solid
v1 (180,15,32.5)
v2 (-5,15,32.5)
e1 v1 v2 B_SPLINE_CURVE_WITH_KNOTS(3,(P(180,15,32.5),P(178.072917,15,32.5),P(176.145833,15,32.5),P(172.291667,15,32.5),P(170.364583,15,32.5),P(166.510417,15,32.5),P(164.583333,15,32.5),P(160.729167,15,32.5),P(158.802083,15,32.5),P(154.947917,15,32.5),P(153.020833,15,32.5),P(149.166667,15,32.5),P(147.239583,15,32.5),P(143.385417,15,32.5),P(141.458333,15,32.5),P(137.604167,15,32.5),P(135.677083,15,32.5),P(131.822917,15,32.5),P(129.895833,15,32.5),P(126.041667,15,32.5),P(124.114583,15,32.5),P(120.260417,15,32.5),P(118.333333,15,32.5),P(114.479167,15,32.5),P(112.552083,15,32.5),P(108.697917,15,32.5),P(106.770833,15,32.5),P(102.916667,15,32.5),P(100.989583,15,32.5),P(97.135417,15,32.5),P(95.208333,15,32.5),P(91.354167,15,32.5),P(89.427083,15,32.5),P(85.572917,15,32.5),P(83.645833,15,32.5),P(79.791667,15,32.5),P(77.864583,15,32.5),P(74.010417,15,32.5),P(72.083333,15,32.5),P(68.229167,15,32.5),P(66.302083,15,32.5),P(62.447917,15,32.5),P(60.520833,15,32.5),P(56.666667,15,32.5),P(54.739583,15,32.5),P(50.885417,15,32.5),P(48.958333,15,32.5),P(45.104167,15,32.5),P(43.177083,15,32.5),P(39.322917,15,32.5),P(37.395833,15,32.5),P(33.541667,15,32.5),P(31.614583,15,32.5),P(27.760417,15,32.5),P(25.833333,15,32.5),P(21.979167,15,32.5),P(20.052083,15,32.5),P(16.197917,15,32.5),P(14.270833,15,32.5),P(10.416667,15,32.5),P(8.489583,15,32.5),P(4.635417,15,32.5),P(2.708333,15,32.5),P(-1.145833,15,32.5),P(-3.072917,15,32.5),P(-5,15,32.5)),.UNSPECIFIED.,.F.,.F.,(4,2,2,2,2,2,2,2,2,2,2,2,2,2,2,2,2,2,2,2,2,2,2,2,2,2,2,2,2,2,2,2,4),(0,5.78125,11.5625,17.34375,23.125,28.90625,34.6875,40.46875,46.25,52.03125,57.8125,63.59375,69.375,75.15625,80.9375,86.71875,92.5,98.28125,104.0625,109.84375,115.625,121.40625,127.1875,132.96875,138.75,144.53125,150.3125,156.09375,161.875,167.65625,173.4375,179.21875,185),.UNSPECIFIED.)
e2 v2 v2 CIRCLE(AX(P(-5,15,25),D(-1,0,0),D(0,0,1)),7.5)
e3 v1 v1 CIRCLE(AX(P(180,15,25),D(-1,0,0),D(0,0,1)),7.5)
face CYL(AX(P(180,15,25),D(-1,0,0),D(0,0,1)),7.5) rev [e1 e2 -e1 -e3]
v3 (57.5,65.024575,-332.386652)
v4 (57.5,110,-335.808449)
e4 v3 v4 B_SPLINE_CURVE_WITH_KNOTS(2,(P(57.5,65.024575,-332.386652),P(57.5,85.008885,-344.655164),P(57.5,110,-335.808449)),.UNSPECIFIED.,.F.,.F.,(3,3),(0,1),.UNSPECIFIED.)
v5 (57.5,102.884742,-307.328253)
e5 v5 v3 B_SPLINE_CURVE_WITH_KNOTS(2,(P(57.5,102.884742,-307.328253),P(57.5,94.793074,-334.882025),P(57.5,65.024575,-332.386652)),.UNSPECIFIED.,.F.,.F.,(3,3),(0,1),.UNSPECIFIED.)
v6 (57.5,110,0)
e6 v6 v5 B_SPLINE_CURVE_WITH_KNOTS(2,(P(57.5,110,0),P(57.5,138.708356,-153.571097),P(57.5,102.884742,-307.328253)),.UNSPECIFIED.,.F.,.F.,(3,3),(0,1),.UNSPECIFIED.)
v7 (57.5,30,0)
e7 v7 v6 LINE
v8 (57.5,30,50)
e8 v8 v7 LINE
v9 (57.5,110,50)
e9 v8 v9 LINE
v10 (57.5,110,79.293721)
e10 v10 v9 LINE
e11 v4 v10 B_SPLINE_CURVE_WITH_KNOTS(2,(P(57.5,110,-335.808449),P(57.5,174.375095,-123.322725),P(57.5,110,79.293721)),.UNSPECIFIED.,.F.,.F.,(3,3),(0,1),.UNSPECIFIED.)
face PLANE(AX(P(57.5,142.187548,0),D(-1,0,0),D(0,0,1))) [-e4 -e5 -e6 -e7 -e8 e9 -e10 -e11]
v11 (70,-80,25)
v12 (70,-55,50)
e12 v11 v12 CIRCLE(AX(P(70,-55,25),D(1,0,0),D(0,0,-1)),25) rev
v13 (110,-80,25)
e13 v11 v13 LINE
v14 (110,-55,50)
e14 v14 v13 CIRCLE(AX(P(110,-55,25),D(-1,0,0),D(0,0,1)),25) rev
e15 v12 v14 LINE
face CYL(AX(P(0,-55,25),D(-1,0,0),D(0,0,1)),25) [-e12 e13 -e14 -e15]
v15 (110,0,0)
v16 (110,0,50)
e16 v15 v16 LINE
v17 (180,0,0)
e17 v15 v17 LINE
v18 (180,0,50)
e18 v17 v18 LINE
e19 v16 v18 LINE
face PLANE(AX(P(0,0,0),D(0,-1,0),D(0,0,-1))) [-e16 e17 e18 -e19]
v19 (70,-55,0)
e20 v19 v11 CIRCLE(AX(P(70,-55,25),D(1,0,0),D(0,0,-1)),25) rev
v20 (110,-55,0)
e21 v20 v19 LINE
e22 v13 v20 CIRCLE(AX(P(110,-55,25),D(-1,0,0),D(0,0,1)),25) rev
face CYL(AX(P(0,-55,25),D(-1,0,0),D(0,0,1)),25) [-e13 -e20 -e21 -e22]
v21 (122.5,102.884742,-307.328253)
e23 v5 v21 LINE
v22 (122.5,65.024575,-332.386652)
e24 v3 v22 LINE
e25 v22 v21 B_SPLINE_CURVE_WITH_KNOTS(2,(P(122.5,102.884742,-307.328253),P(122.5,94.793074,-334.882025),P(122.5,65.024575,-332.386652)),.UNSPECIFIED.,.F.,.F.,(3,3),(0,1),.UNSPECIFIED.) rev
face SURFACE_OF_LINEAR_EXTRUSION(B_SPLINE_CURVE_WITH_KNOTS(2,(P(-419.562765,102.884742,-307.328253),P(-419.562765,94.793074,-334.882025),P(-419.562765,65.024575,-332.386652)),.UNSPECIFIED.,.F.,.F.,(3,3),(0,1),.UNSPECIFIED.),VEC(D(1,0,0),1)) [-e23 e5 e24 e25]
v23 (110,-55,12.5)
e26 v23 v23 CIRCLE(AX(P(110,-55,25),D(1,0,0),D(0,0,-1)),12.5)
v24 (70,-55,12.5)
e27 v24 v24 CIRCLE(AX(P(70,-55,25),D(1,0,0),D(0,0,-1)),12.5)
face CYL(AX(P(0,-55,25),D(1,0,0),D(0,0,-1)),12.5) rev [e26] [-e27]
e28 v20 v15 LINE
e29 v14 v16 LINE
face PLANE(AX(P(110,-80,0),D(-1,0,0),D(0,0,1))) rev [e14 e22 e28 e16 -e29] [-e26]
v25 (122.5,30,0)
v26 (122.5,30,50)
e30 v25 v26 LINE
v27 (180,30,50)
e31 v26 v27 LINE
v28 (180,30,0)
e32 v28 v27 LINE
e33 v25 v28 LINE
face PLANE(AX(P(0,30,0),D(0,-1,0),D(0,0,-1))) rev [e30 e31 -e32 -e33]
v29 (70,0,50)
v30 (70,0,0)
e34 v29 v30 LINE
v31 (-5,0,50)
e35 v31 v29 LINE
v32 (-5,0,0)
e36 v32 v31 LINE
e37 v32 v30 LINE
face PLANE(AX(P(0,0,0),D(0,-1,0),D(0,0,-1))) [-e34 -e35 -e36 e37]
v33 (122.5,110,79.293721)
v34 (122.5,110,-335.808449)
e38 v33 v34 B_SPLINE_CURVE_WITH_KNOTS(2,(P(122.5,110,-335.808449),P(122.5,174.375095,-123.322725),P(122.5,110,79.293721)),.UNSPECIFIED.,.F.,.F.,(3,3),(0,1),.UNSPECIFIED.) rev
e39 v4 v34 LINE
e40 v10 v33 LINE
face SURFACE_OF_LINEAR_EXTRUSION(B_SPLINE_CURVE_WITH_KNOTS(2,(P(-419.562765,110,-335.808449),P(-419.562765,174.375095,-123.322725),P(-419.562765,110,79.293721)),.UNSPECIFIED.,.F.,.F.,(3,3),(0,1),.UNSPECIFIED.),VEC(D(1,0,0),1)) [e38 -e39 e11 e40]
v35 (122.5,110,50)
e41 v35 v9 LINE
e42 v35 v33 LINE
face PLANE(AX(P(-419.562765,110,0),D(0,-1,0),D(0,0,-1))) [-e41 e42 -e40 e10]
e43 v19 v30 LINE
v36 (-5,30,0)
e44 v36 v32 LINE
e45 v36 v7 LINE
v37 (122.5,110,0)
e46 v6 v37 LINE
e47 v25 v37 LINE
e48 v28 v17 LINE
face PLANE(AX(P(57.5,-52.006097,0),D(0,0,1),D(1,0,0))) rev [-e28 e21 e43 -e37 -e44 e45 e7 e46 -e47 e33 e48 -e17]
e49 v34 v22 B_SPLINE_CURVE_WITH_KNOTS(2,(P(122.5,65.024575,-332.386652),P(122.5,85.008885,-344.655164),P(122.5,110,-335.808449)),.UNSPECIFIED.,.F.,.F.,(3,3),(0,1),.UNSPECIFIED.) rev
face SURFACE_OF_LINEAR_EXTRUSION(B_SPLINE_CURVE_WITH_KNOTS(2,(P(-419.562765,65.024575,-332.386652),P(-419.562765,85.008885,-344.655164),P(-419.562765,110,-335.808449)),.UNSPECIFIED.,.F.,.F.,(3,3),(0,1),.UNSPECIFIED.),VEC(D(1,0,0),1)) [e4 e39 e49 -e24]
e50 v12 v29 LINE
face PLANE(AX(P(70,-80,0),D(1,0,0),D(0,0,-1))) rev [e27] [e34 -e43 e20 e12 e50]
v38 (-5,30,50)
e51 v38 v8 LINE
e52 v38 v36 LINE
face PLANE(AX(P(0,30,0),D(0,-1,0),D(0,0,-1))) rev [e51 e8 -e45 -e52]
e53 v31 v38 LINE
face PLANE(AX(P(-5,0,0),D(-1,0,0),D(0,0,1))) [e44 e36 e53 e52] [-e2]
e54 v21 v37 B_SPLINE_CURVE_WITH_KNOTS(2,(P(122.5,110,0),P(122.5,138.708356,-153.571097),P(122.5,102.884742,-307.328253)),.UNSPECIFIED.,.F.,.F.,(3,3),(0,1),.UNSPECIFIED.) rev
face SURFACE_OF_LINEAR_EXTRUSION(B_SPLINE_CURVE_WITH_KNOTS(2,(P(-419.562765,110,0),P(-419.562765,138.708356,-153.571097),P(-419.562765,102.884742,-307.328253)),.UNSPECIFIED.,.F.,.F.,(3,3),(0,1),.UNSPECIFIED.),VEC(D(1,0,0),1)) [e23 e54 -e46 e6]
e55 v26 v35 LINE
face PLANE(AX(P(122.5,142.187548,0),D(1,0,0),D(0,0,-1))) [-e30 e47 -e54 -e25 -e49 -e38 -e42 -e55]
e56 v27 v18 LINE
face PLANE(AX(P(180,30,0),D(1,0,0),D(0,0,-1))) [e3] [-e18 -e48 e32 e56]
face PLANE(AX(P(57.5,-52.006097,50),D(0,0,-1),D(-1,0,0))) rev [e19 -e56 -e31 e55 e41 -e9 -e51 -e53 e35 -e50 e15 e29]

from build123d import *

# Parameters (mm, degrees)
SKETCH_1_W          = 180
SKETCH_1_H          = 50
EXTRUDE_1_DEPTH     = 30
SKETCH_2_W          = 40
SKETCH_2_H          = 50
EXTRUDE_2_DEPTH     = 80
FILLET_1_R          = 25
SKETCH_3_R          = 12.5
CUT_EXTRUDE_2_DEPTH = 145.913767462
SKETCH_7_W          = 25
SKETCH_7_H          = 50
EXTRUDE_5_DEPTH     = 80
EXTRUDE_6_REACH     = 213.019
SKETCH_9_W          = 25.5
SKETCH_9_H          = 50
CUT_EXTRUDE_3_DEPTH = 401.320460854
SKETCH_10_W         = 65
SKETCH_10_H         = 50
EXTRUDE_7_DEPTH     = 80
SKETCH_11_W         = 50
SKETCH_11_H         = 30
EXTRUDE_8_DEPTH     = 10
SKETCH_12_W         = 50
SKETCH_12_H         = 30
CUT_EXTRUDE_4_DEPTH = 5
SKETCH_13_R         = 7.5
CUT_EXTRUDE_5_DEPTH = 412.96204223


with BuildPart() as part:
    # 草图1 → 凸台-拉伸1 (new body)
    with BuildSketch(Plane(origin=(0, 0, 0), x_dir=(1, 0, 0), z_dir=(0, 1, 0))):
        with Locations((90, -25)):
            Rectangle(SKETCH_1_W, SKETCH_1_H)
    extrude(amount=EXTRUDE_1_DEPTH)

    # 草图2 → 凸台-拉伸2 (add)
    with BuildSketch(Plane.XZ):
        with Locations((90, 25)):
            Rectangle(SKETCH_2_W, SKETCH_2_H)
    extrude(amount=EXTRUDE_2_DEPTH)

    # 圆角1
    fillet_1_edges = [part.edges().sort_by_distance(p)[0] for p in [
        (90, -80, 50),
        (90, -80, 0),
    ]]
    fillet(fillet_1_edges, radius=FILLET_1_R - 0.0001)  # a hair under: the kernel refuses the full size

    # 草图3 → 切除-拉伸2 (cut, through all)
    with BuildSketch(Plane(origin=(110, 0, 0), x_dir=(0, 0, -1), z_dir=(1, 0, 0))):
        with Locations((-25, -55)):
            Circle(SKETCH_3_R)
    extrude(amount=-CUT_EXTRUDE_2_DEPTH, mode=Mode.SUBTRACT)

    # 草图7 → 凸台-拉伸5 (add)
    with BuildSketch(Plane(origin=(0, 30, 0), x_dir=(1, 0, 0), z_dir=(0, 1, 0))):
        with Locations((19.5, -25)):
            Rectangle(SKETCH_7_W, SKETCH_7_H)
        with Locations((160.5, -25)):
            Rectangle(SKETCH_7_W, SKETCH_7_H)
    extrude(amount=EXTRUDE_5_DEPTH)

    # 凸台-拉伸6: up to this face of the body (flat: up to its plane)
    extrude_6_end = Plane(part.part.faces().sort_by_distance((7, 70, 25))[0])
    # 草图8 → 凸台-拉伸6 (add, up to the picked face)
    with BuildSketch(Plane(origin=(173, 0, 0), x_dir=(0, 0, -1), z_dir=(1, 0, 0)), mode=Mode.PRIVATE) as extrude_6_sk1:
        with BuildLine():
            Line((0, 110), (-79.29372145, 110))
            add(Edge.make_bspline(
                [(-79.29372145, 110), (123.322725029, 174.375095478), (335.808448859, 110)],
                knots=[0, 0, 0, 1, 1, 1], degree=2))
            add(Edge.make_bspline(
                [(335.808448859, 110), (344.655163531, 85.008885119), (332.386652106, 65.024574676)],
                knots=[0, 0, 0, 1, 1, 1], degree=2))
            add(Edge.make_bspline(
                [(332.386652106, 65.024574676), (334.882025134, 94.793074398), (307.328252939, 102.88474179)],
                knots=[0, 0, 0, 1, 1, 1], degree=2))
            add(Edge.make_bspline(
                [(307.328252939, 102.88474179), (153.571097441, 138.708355764), (0, 110)],
                knots=[0, 0, 0, 1, 1, 1], degree=2))
        make_face()
    extrude_6_tool1 = split(extrude(extrude_6_sk1.sketch, amount=-EXTRUDE_6_REACH, mode=Mode.PRIVATE), bisect_by=extrude_6_end, keep=Keep.BOTH, mode=Mode.PRIVATE)
    add(extrude_6_tool1.solids().sort_by(Axis((173, 122.914419, -143.709252), (-1, 0, 0)))[0])

    # 草图9 → 切除-拉伸3 (cut, through all)
    with BuildSketch(Plane(origin=(0, 30, 0), x_dir=(1, 0, 0), z_dir=(0, 1, 0))):
        Polygon((57.5, -50), (32, -50), (32, 0), (57.5, 0), (57.5, 350.332715619), (7, 350.332715619), (7, -79.29372145), (57.5, -79.29372145), align=None)
        Polygon((148, -50), (122.5, -50), (122.5, -79.29372145), (173, -79.29372145), (173, 350.332715619), (122.5, 350.332715619), (122.5, 0), (148, 0), align=None)
        with Locations((44.75, -25)):
            Rectangle(SKETCH_9_W, SKETCH_9_H)
        with Locations((135.25, -25)):
            Rectangle(SKETCH_9_W, SKETCH_9_H)
    extrude(amount=CUT_EXTRUDE_3_DEPTH, mode=Mode.SUBTRACT)


with BuildPart() as cut_extrude_3_piece_1:
    # of the separate pieces the step leaves, piece 1, a body of its own (cut_extrude_3_pieces)
    add(part.part.solids().sort_by_distance((122.5, 110, 0))[0])



with BuildPart() as cut_extrude_3_piece_2:
    # of the separate pieces the step leaves, piece 2, a body of its own (cut_extrude_3_pieces)
    add(part.part.solids().sort_by_distance((110, -55.0001, 0))[0])


with BuildPart() as cut_extrude_3_piece_1_1:
    add(cut_extrude_3_piece_1.part)

    add(cut_extrude_3_piece_2.part)  # 凸台-拉伸7 merges 切除-拉伸3 piece 2
    # 草图10 → 凸台-拉伸7 (add)
    with BuildSketch(Plane.XZ.offset(-110)):
        with Locations((90, 25)):
            Rectangle(SKETCH_10_W, SKETCH_10_H)
    extrude(amount=EXTRUDE_7_DEPTH)

    # 草图11 → 凸台-拉伸8 (add)
    with BuildSketch(Plane.ZY):
        with Locations((25, 15)):
            Rectangle(SKETCH_11_W, SKETCH_11_H)
    extrude(amount=EXTRUDE_8_DEPTH)

    # 草图12 → 切除-拉伸4 (cut)
    with BuildSketch(Plane.ZY.offset(10)):
        with Locations((25, 15)):
            Rectangle(SKETCH_12_W, SKETCH_12_H)
    extrude(amount=-CUT_EXTRUDE_4_DEPTH, mode=Mode.SUBTRACT)

    # 草图13 → 切除-拉伸5 (cut, through all)
    with BuildSketch(Plane.ZY.offset(5)):
        with Locations((25, 15)):
            Circle(SKETCH_13_R)
    extrude(amount=-CUT_EXTRUDE_5_DEPTH, mode=Mode.SUBTRACT)


solid = cut_extrude_3_piece_1_1.part
